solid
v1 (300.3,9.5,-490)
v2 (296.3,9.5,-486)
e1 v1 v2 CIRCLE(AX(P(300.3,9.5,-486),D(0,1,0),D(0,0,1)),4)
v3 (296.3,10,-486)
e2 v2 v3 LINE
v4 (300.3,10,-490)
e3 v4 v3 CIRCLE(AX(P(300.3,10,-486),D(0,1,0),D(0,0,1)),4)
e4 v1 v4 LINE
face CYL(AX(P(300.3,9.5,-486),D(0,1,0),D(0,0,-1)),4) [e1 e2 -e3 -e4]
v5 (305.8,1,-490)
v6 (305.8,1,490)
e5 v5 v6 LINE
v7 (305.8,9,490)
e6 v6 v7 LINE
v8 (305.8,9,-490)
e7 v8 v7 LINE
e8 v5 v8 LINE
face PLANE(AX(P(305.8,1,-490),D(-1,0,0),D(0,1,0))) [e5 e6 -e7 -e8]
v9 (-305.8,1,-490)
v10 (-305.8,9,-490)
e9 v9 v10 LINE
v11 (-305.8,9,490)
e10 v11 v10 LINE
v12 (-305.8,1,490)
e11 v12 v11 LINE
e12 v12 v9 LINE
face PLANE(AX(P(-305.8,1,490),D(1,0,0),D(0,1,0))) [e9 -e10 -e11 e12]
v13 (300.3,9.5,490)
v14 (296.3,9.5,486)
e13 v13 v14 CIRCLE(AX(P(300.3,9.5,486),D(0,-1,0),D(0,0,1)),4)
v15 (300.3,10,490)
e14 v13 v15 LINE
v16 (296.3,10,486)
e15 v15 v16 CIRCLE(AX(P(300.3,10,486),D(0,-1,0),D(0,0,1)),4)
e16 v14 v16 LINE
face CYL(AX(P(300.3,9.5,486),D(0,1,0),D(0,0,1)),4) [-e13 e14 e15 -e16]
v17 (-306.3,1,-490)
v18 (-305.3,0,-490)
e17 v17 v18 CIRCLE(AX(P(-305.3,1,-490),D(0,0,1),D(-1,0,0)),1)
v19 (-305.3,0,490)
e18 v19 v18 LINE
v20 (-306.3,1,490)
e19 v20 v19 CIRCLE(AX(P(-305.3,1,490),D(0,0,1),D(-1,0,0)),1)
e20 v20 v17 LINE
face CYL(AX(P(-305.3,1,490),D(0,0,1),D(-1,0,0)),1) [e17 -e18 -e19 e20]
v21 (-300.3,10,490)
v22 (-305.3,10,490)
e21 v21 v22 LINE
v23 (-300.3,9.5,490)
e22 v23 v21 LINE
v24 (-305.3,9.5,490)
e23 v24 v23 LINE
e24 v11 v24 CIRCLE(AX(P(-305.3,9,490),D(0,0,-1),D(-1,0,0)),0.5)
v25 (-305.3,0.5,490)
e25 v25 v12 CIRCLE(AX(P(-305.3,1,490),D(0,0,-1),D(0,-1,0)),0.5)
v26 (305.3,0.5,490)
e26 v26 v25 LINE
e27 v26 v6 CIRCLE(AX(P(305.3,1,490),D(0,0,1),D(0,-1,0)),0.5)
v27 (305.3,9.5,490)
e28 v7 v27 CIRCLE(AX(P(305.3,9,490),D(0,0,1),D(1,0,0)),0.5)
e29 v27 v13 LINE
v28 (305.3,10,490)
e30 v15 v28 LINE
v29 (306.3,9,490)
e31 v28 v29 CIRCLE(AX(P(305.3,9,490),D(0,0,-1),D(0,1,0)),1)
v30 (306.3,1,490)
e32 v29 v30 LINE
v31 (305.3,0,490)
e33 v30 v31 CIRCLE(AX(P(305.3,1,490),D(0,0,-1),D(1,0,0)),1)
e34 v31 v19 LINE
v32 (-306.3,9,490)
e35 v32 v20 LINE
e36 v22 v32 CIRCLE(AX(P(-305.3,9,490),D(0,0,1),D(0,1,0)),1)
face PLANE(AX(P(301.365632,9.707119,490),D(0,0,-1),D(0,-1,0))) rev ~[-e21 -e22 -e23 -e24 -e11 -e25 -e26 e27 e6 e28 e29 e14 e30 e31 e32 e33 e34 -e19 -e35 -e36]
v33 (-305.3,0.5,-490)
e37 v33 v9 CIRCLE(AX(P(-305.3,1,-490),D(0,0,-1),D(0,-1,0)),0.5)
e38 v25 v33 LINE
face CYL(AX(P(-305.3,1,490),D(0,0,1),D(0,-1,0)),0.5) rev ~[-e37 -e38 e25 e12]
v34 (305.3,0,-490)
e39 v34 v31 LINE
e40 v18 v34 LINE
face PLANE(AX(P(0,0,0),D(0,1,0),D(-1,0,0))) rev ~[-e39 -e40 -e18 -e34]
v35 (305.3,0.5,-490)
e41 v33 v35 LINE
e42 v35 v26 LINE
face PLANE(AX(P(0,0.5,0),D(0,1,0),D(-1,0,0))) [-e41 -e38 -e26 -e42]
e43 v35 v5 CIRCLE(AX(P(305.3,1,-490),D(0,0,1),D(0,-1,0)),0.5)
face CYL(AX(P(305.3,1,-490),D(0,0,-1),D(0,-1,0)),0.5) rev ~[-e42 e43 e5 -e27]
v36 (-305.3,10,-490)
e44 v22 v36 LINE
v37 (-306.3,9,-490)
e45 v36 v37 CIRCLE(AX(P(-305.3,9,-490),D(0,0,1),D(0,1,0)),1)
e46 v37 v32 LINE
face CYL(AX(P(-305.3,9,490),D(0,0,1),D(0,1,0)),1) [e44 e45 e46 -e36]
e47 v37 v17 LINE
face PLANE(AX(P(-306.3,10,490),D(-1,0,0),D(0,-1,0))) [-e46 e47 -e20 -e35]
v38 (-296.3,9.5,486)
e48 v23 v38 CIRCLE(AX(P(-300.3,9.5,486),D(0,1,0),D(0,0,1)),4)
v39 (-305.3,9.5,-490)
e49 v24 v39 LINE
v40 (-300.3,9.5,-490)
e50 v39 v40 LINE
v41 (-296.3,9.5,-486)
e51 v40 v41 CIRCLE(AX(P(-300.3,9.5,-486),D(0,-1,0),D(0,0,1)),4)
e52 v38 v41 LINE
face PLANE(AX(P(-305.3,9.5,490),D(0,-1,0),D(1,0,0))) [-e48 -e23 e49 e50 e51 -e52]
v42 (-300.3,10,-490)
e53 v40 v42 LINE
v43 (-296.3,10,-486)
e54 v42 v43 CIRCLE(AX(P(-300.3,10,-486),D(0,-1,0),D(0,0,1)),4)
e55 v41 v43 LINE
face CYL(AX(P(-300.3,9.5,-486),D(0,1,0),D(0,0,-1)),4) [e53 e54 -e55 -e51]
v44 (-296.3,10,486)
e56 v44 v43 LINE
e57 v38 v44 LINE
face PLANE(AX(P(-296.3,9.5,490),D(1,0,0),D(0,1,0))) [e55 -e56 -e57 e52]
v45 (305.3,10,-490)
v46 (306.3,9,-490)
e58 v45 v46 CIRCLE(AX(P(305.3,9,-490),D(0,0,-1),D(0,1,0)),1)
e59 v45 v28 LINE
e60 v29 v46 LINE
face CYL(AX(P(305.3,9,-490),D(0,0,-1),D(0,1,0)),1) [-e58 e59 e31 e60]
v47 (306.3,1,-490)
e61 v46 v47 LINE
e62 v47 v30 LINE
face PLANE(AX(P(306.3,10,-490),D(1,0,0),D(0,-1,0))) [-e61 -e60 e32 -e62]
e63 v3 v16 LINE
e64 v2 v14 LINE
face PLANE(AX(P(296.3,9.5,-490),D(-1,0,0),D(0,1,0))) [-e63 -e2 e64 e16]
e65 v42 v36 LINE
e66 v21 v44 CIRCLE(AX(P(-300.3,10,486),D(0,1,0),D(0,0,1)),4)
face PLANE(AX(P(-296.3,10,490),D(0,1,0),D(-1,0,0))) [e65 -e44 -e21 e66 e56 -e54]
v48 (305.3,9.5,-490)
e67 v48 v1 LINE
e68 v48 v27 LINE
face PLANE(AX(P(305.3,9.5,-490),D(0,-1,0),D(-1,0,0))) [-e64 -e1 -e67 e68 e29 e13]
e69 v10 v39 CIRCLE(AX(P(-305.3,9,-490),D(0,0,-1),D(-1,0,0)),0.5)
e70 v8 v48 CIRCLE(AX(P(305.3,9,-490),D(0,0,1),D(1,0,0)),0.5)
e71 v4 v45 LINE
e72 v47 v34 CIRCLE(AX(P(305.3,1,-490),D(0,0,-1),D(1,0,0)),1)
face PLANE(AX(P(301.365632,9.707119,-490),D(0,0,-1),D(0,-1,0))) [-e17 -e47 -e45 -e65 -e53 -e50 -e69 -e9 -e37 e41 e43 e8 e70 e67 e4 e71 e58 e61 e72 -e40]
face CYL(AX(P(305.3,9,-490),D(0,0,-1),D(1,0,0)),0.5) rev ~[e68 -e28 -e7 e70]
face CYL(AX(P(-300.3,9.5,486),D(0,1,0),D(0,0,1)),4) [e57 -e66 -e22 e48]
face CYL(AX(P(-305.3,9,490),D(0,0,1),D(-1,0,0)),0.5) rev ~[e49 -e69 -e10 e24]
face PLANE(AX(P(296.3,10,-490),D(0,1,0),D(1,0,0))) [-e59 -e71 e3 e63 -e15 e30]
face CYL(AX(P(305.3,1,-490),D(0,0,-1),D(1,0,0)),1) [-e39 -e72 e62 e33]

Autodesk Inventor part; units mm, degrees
ref_plane "YZ Plane" through (0, 0, 0) normal (1, 0, 0) x (0, 1, 0)
ref_plane "XZ Plane" through (0, 0, 0) normal (0, 1, 0) x (-1, 0, 0)
ref_plane "XY Plane" through (0, 0, 0) normal (0, 0, 1) x (1, 0, 0)
sketch "Sketch6" plane through (0, 0, 0) normal (0, 1, 0) x (-1, 0, 0)
  line L0 (306.3, -490) -> (-306.3, -490)
  line L1 (-306.3, -490) -> (-306.3, 490)
  line L2 (-306.3, 490) -> (306.3, 490)
  line L3 (306.3, 490) -> (306.3, -490)
  line L4 (306.3, -490) -> (-306.3, 490) construction
  line L5 (-306.3, -490) -> (306.3, 490) construction
  point P0 (0, 0)
  dimension "d52" = 612.6
  dimension "d53" = 980
extrude "Plate2" add sketch "Sketch6" along normal blind 0.5
sketch "Sketch11" plane through (-305.8, 0, 490) normal (-1, 0, 0) x (0, -1, 0)
  line L0 (0, -980) -> (0, 0)
  line L1 (0, 0) -> (-10, 0)
  line L2 (-10, 0) -> (-10, -980)
  line L3 (-10, -980) -> (0, -980)
edge flange "Flange2" height 10 angle 90 thickness 0.5 bend radius 0.5 thickness toward (-1, 0, 0) relief tear relief width 0.5 relief depth 0.25 edges at (-306.3, 0.5, 0) wall of the first edge with corners at (-305.8, 0, -490) (-305.8, 0, 490) (-305.8, 10, 490) (-305.8, 10, -490)
bend "Bend3"
corner "Corner3"
sketch "Sketch12" plane through (-306.3, 9.5, 490) normal (0, 1, 0) x (-1, 0, 0)
  line L0 (0, -980) -> (0, 0)
  line L1 (0, 0) -> (-10, 0)
  line L2 (-10, 0) -> (-10, -980)
  line L3 (-10, -980) -> (0, -980)
edge flange "Flange3" height 10 angle 90 thickness 0.5 bend radius 0.5 thickness toward (0, 1, 0) relief tear relief width 0.5 relief depth 0.25 edges at (-305.8, 10, 0) wall of the first edge with corners at (-306.3, 9.5, -490) (-306.3, 9.5, 490) (-296.3, 9.5, 490) (-296.3, 9.5, -490)
bend "Bend4"
corner "Corner4"
sketch "Sketch13" plane through (305.8, 0, -490) normal (1, 0, 0) x (0, 1, 0)
  line L0 (0, 980) -> (0, 0)
  line L1 (0, 0) -> (10, 0)
  line L2 (10, 0) -> (10, 980)
  line L3 (10, 980) -> (0, 980)
edge flange "Flange4" height 10 angle 90 thickness 0.5 bend radius 0.5 thickness toward (1, 0, 0) relief tear relief width 0.5 relief depth 0.25 edges at (306.3, 0.5, 0) wall of the first edge with corners at (305.8, 0, 490) (305.8, 0, -490) (305.8, 10, -490) (305.8, 10, 490)
bend "Bend5"
corner "Corner5"
sketch "Sketch14" plane through (306.3, 9.5, -490) normal (0, 1, 0) x (-1, 0, 0)
  line L0 (0, 980) -> (0, 0)
  line L1 (0, 0) -> (10, 0)
  line L2 (10, 0) -> (10, 980)
  line L3 (10, 980) -> (0, 980)
edge flange "Flange5" height 10 angle 90 thickness 0.5 bend radius 0.5 thickness toward (0, 1, 0) relief tear relief width 0.5 relief depth 0.25 edges at (305.8, 10, 0) wall of the first edge with corners at (306.3, 9.5, 490) (306.3, 9.5, -490) (296.3, 9.5, -490) (296.3, 9.5, 490)
bend "Bend6"
corner "Corner6"
fillet "Corner Round1" radius 4 4 edges at (296.3, 9.75, -490) (296.3, 9.75, 490) (-296.3, 9.75, -490) (-296.3, 9.75, 490)
equation "\"d52\" = ЖАБРЫ_базовая_ширина - 3 * ЖАБРЫ_шаг_листов"
equation "\"d53\" = ЖАБРЫ_базовая_длина_кор_лист"
equation "\"d54\" = Thickness"
equation "\"d84\" = BendReliefWidth"
equation "\"d85\" = BendReliefDepth"
equation "\"d86\" = MinimumRemnant"
equation "\"d87\" = TransitionRadius"
equation "\"d90\" = BendRadius"
equation "\"d91\" = CornerReliefSize"
equation "\"d92\" = GapSize"
equation "\"d93\" = JacobiRadiusSize"
equation "\"d94\" = BendReliefWidth"
equation "\"d95\" = BendReliefDepth"
equation "\"d96\" = MinimumRemnant"
equation "\"d97\" = TransitionRadius"
equation "\"d100\" = BendRadius"
equation "\"d101\" = CornerReliefSize"
equation "\"d102\" = GapSize"
equation "\"d103\" = JacobiRadiusSize"
equation "\"d104\" = BendReliefWidth"
equation "\"d105\" = BendReliefDepth"
equation "\"d106\" = MinimumRemnant"
equation "\"d107\" = TransitionRadius"
equation "\"d110\" = BendRadius"
equation "\"d111\" = CornerReliefSize"
equation "\"d112\" = GapSize"
equation "\"d113\" = JacobiRadiusSize"
equation "\"d114\" = BendReliefWidth"
equation "\"d115\" = BendReliefDepth"
equation "\"d116\" = MinimumRemnant"
equation "\"d117\" = TransitionRadius"
equation "\"d120\" = BendRadius"
equation "\"d121\" = CornerReliefSize"
equation "\"d122\" = GapSize"
equation "\"d123\" = JacobiRadiusSize"
equation "\"BendRadius\" = Thickness"
equation "\"BendReliefWidth\" = Thickness"
equation "\"BendReliefDepth\" = 0.5 * Thickness"
equation "\"CornerReliefSize\" = 4 * Thickness"
equation "\"MinimumRemnant\" = 2 * Thickness"
equation "\"TransitionRadius\" = BendRadius"
equation "\"JacobiRadiusSize\" = BendRadius"
equation "\"GapSize\" = Thickness"
equation "\"ЖАБРЫ_базовая_ширина\" = 915"
equation "\"ЖАБРЫ_шаг_листов\" = 100.8"
equation "\"ЖАБРЫ_базовая_длина_кор_лист\" = 980"
equation "\"Thickness\" = 0.5"
properties part number "MSC 807 SHEET GILLS" material "Stainless Steel"
